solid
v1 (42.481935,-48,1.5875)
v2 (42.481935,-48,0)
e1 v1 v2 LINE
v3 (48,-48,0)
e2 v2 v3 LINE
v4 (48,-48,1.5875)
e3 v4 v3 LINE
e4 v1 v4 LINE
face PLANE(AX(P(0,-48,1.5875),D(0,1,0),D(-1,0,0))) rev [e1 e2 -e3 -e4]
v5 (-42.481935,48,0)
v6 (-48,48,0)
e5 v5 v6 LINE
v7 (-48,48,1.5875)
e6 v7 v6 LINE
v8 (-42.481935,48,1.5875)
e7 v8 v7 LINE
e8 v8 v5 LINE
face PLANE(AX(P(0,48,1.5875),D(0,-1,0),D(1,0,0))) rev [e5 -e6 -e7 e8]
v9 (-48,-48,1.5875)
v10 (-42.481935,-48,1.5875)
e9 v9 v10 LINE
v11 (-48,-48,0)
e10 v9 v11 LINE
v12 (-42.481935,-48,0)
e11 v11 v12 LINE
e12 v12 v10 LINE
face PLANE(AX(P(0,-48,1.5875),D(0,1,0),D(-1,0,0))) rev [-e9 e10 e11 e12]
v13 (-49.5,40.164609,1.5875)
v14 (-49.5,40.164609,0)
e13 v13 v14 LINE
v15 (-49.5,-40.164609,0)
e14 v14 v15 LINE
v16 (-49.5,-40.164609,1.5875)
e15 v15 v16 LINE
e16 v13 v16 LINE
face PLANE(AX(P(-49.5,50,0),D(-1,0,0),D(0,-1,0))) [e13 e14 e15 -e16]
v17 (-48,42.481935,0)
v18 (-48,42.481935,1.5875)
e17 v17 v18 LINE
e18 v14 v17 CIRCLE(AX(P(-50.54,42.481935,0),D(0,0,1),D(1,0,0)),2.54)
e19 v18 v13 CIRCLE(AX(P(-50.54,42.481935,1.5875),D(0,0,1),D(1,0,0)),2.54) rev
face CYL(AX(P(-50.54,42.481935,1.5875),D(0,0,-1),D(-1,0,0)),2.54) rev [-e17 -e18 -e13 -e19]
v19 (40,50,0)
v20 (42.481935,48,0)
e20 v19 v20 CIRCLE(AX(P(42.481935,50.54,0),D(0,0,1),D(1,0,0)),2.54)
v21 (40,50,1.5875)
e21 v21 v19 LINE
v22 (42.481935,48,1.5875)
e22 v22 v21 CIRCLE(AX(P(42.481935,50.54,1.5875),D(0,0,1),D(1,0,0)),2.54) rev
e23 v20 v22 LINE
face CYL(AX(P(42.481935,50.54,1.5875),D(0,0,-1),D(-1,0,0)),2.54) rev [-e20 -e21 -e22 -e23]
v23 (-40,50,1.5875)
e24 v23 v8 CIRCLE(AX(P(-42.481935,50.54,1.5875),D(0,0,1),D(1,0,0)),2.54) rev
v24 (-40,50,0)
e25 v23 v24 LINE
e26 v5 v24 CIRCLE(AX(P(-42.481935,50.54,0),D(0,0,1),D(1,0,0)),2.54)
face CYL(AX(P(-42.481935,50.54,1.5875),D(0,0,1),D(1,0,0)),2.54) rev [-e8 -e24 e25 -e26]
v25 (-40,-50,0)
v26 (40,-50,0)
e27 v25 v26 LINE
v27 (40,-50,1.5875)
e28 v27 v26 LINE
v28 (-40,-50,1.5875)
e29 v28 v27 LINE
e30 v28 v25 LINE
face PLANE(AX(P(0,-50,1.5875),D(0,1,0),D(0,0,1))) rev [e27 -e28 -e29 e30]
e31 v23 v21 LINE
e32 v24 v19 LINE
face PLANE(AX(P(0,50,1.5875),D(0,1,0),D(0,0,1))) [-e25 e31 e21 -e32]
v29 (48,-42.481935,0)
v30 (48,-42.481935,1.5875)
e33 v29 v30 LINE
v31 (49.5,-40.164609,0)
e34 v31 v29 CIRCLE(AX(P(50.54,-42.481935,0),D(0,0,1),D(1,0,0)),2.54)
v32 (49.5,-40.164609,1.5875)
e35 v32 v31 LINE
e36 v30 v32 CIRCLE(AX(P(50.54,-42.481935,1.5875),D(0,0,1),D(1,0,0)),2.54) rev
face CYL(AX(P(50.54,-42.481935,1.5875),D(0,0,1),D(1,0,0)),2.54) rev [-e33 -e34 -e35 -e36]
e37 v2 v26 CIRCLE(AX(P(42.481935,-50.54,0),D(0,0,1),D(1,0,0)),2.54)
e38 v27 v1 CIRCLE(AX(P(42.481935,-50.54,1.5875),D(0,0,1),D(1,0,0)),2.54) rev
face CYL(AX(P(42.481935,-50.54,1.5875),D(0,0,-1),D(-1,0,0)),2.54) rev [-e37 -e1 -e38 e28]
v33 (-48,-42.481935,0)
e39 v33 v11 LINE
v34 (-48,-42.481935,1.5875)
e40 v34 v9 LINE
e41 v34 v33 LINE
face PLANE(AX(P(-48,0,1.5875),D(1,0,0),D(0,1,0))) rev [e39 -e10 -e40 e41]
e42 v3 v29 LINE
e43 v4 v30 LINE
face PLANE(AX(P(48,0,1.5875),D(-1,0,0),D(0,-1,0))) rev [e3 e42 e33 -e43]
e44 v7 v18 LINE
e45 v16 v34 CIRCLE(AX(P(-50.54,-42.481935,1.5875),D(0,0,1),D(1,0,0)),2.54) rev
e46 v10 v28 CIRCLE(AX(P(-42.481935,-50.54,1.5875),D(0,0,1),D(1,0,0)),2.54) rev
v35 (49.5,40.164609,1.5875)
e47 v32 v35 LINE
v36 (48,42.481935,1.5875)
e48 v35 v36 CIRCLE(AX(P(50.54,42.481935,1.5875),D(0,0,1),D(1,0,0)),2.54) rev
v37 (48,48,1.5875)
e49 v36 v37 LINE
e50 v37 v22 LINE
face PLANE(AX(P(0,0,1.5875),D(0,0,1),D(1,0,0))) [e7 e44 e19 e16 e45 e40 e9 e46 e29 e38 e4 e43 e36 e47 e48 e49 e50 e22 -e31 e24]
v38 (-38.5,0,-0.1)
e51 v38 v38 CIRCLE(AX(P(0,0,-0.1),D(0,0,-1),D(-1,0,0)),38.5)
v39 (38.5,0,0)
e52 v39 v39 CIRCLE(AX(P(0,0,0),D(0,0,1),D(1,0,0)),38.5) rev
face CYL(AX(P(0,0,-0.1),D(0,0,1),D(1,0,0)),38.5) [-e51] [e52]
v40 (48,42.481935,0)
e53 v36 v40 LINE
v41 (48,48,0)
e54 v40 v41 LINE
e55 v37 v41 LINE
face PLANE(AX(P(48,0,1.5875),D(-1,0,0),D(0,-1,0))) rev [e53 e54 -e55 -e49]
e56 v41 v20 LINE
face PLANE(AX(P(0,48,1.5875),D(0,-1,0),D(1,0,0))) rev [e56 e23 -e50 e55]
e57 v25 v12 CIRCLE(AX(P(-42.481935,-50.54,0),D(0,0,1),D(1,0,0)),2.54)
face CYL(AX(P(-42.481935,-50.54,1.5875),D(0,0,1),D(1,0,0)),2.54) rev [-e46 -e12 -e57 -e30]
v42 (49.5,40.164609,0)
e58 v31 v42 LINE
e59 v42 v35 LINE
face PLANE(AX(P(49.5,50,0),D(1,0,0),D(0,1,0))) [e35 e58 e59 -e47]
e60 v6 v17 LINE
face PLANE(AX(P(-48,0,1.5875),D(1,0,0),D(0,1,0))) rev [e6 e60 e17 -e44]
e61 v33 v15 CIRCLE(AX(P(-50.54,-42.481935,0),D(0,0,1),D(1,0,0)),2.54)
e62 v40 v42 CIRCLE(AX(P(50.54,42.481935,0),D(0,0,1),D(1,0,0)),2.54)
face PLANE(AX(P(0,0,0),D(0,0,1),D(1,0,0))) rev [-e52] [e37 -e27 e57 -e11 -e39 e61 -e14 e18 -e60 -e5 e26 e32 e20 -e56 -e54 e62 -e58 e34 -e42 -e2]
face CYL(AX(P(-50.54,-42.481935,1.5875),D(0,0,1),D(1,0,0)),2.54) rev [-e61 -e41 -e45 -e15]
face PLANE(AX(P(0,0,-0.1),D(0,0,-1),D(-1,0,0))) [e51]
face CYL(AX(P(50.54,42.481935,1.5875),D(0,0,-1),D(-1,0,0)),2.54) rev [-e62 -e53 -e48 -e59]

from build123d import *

# Parameters (mm, degrees)
BOSS_EXTRUDE1_DEPTH = 1.5875
FILLET1_R           = 2.54
SKETCH6_OUTSIDE_W   = 130.286
SKETCH6_OUTSIDE_H   = 130.286
SKETCH6_OUTSIDE_W_2 = 99
SKETCH6_OUTSIDE_H_2 = 100
CUT_EXTRUDE2_DEPTH  = 71.728496069
SKETCH7_R           = 38.5
BOSS_EXTRUDE2_DEPTH = 0.1


with BuildPart() as part:
    # Sketch1 → Boss-Extrude1 (new body)
    with BuildSketch(Plane.XY):
        Polygon((40, 50), (-40, 50), (-40, 48), (-48, 48), (-48, 40), (-50, 40), (-50, -37.864895224), (-50, -40), (-48, -40), (-48, -48), (-40, -48), (-40, -50), (-37.864895224, -50), (40, -50), (40, -48), (48, -48), (48, -40), (50, -40), (50, 40), (48, 40), (48, 48), (40, 48), align=None)
    extrude(amount=BOSS_EXTRUDE1_DEPTH)

    # Fillet1
    # the kernel refuses this fillet: 2.54 mm, written as the material it adds along each edge
    with BuildSketch(Plane(origin=(-48, -40, 0), x_dir=(0, -1, 0), z_dir=(0, 0, 1)), Plane(origin=(40, -48, 0), x_dir=(1, 0, 0), z_dir=(0, 0, 1)), Plane(origin=(48, 40, 0), x_dir=(0, 1, 0), z_dir=(0, 0, 1)), Plane(origin=(-40, 48, 0), x_dir=(-1, 0, 0), z_dir=(0, 0, 1))) as fillet1_piece_1:
        with BuildLine():
            CenterArc((2.481934729, -2.54), FILLET1_R, 90, 77.725329785)
            Line((0, -2), (-0.049638695, -1.9892))
            ThreePointArc((-0.049638695, -1.9892), (-0.0508, -1), (-0.0508, 0))
            Line((-0.0508, 0), (0, 0.0508))
            Line((0, 0.0508), (2.481934729, 0.0508))
            Line((2.481934729, 0.0508), (2.481934729, 0))
        make_face()
    extrude(amount=1.5875)
    with BuildSketch(Plane(origin=(-40, -48, 0), x_dir=(-3.737454790095179e-12, -1.0, 0), z_dir=(0, 0, 1)), Plane(origin=(48, -40, 0), x_dir=(1.0, -3.7339020764163554e-12, 0), z_dir=(0, 0, 1)), Plane(origin=(-48, 40, 0), x_dir=(-1.0, 3.737454790095126e-12, 0), z_dir=(0, 0, 1))) as fillet1_piece_2:
        with BuildLine():
            CenterArc((2.54, -2.481934729), FILLET1_R, 102.274670215, 77.725329785)
            Line((0, -2.481934729), (-0.0508, -2.481934729))
            Line((-0.0508, -2.481934729), (-0.0508, 0))
            Line((-0.0508, 0), (0, 0.0508))
            ThreePointArc((0, 0.0508), (1, 0.0508), (1.9892, 0.049638695))
            Line((1.9892, 0.049638695), (2, 0))
        make_face()
    extrude(amount=1.5875)
    with BuildSketch(Plane(origin=(40, 48, 0), x_dir=(1, 0, 0), z_dir=(0, 0, 1))) as fillet1_piece_3:
        with BuildLine():
            CenterArc((2.481934729, 2.54), FILLET1_R, 192.274670215, 77.725329785)
            Line((0, 2), (-0.049638695, 1.9892))
            ThreePointArc((-0.049638695, 1.9892), (-0.0508, 1), (-0.0508, 0))
            Line((-0.0508, 0), (0, -0.0508))
            Line((0, -0.0508), (2.481934729, -0.0508))
            Line((2.481934729, -0.0508), (2.481934729, 0))
        make_face()
    extrude(amount=1.5875)

    # Sketch6 outside → Cut-Extrude2 (cut, through all)
    with BuildSketch(Plane.XY.offset(1.5875)):
        Rectangle(SKETCH6_OUTSIDE_W, SKETCH6_OUTSIDE_H)
        Rectangle(SKETCH6_OUTSIDE_W_2, SKETCH6_OUTSIDE_H_2, mode=Mode.SUBTRACT)
    extrude(amount=-CUT_EXTRUDE2_DEPTH, mode=Mode.SUBTRACT)

    # Sketch7 → Boss-Extrude2 (add)
    with BuildSketch(Plane(origin=(0, 0, 0), x_dir=(-1, 0, 0), z_dir=(0, 0, -1))):
        with Locations(Location((0, 0, 0), (0, 0, 180))):
            Circle(SKETCH7_R)
    extrude(amount=BOSS_EXTRUDE2_DEPTH)


solid = part.part
